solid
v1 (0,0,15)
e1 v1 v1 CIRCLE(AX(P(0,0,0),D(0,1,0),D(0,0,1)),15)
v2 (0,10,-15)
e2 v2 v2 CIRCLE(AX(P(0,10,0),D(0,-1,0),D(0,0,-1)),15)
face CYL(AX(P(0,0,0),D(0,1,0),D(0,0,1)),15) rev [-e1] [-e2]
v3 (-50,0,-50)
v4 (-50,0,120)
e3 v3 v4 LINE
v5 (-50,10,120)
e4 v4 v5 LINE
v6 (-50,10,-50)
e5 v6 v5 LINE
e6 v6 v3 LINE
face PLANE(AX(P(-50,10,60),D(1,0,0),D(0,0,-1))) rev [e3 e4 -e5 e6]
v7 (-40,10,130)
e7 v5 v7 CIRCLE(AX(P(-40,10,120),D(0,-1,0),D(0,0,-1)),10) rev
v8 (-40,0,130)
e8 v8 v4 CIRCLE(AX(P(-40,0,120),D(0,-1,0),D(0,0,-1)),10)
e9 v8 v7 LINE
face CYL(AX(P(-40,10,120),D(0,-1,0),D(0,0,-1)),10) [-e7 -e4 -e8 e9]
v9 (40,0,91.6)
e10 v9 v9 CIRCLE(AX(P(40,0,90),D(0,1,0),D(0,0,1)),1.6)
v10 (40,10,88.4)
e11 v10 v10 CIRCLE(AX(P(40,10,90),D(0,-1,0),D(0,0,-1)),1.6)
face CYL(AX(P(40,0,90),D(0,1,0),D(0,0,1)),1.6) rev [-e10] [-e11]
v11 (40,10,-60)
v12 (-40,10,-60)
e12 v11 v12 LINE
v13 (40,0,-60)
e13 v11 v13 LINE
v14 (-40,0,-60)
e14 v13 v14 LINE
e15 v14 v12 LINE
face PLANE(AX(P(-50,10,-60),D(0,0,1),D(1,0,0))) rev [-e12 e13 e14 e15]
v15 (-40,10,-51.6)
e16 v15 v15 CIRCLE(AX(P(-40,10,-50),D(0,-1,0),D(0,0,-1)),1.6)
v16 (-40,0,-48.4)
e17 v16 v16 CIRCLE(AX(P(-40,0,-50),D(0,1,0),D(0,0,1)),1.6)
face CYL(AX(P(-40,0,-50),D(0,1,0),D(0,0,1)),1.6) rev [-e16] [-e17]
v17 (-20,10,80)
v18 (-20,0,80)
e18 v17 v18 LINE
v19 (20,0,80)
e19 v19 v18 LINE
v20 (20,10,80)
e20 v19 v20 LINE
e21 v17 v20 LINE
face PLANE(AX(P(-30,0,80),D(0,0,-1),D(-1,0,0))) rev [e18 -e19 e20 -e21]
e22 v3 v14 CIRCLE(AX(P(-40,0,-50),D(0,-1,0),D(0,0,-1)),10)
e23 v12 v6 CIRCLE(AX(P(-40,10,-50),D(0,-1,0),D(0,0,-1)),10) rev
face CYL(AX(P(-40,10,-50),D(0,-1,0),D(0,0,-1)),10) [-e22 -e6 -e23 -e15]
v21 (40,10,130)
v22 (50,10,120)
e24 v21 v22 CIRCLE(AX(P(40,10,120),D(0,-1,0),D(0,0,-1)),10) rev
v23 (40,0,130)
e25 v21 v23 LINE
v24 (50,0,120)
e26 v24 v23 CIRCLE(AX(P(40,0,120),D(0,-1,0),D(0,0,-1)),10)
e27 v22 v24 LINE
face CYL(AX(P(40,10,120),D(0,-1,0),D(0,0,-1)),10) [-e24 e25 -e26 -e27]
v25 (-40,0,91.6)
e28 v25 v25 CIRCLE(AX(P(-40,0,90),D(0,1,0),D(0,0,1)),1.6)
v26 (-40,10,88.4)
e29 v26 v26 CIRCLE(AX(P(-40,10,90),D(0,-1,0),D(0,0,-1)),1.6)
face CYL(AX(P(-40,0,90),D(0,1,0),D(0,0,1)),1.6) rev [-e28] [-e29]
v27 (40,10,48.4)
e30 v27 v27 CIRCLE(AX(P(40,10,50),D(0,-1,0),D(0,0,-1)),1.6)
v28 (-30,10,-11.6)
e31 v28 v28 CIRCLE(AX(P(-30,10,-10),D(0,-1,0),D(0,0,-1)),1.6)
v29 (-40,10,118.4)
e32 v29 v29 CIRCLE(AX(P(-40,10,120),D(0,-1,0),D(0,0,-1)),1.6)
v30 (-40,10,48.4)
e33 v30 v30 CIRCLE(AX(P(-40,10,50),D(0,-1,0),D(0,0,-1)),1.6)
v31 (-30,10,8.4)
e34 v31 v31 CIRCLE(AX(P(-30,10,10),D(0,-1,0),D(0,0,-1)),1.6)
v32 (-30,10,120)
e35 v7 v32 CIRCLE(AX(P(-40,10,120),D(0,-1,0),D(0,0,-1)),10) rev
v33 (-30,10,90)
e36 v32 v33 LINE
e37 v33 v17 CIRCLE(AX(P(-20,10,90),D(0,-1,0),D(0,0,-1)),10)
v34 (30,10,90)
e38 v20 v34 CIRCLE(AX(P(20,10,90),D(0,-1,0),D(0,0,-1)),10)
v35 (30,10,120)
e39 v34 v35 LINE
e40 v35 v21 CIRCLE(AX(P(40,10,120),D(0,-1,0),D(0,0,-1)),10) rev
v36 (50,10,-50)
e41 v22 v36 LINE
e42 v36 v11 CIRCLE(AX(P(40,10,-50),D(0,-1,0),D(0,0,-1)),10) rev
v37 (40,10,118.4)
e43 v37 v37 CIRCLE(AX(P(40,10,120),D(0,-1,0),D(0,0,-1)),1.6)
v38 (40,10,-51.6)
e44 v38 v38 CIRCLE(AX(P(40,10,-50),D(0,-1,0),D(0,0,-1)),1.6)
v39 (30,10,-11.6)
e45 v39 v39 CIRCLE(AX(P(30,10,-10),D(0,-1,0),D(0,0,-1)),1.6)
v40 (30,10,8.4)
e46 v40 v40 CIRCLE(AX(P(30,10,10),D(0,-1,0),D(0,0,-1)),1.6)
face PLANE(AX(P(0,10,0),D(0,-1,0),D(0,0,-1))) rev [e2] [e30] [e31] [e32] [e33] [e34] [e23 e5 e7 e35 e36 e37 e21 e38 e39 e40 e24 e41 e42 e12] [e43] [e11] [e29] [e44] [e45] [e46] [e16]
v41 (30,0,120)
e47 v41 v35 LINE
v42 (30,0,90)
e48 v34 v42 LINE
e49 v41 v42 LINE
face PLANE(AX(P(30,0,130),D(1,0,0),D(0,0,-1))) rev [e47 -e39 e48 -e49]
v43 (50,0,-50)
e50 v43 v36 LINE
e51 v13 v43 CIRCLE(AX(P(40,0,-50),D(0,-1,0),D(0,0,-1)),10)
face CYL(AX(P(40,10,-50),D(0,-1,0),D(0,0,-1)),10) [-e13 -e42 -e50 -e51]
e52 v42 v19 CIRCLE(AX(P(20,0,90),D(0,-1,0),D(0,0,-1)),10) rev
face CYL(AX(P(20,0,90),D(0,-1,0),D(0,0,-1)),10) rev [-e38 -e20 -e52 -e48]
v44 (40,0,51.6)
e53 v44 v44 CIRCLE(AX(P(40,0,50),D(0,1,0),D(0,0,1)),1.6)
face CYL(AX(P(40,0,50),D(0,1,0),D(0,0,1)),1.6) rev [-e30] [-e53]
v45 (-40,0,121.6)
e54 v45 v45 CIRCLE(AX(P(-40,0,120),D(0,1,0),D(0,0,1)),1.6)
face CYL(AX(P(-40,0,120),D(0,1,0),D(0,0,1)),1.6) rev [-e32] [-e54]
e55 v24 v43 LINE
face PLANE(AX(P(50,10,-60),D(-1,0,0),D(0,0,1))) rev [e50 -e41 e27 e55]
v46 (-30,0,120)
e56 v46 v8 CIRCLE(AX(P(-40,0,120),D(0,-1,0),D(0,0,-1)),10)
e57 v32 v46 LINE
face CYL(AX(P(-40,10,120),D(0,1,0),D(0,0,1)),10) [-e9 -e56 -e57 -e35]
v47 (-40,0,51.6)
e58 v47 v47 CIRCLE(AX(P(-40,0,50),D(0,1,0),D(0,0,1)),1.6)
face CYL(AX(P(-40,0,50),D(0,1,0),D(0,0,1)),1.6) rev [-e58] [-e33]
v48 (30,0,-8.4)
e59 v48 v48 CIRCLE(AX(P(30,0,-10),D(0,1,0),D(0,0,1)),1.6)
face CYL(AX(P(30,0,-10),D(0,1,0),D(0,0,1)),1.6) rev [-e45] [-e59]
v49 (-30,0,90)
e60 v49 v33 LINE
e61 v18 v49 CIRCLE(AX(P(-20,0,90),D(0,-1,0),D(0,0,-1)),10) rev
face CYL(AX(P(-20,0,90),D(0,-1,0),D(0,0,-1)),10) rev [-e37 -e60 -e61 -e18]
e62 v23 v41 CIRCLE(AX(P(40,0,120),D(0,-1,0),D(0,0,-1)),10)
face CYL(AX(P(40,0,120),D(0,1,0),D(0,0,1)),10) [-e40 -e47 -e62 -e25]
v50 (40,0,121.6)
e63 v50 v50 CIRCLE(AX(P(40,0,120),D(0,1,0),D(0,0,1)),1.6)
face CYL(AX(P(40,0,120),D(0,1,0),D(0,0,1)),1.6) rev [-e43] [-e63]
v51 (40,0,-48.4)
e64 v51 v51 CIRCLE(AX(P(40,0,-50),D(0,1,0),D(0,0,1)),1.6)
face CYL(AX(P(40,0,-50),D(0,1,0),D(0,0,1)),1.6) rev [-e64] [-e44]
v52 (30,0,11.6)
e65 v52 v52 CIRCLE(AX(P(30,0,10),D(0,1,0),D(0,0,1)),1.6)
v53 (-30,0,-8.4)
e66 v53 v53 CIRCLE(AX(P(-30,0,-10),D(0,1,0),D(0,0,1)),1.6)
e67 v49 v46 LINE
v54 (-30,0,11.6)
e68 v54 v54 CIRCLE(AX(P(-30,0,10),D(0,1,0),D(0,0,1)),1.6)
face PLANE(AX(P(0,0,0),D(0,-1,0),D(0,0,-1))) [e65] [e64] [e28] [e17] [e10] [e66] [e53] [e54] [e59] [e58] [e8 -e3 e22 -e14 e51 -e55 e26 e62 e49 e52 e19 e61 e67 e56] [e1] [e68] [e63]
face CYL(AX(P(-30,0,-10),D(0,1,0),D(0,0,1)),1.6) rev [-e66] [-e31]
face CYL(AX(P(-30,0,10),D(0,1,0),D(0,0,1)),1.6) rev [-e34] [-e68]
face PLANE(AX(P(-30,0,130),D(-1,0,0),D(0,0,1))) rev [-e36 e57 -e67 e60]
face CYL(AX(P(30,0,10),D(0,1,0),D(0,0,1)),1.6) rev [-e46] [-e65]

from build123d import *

# Parameters (mm, degrees)
BOSS_EXTRUDE1_DEPTH     = 10
CUT_EXTRUDE1_DEPTH      = 140.642400438
CUT_EXTRUDE1_DEPTH_BACK = 140.642400438
SKETCH2_R               = 15
SKETCH2_R_2             = 1.6
CUT_EXTRUDE2_DEPTH      = 140.642400438
CUT_EXTRUDE2_DEPTH_BACK = 140.642400438
SKETCH3_W               = 60
SKETCH3_H               = 50
CUT_EXTRUDE3_DEPTH      = 140.642400438
CUT_EXTRUDE3_DEPTH_BACK = 140.642400438
SKETCH4_R               = 1.6
FILLET1_R               = 10


with BuildPart() as part:
    # Sketch1 → Boss-Extrude1 (new body)
    with BuildSketch(Plane(origin=(0, 0, 0), x_dir=(1, 0, 0), z_dir=(0, 1, 0))):
        Polygon((-50, -60), (-50, -130), (50, -130), (50, -60), (50, 60), (-50, 60), align=None)
    extrude(amount=BOSS_EXTRUDE1_DEPTH)

    # Sketch2 → Cut-Extrude1 (cut, two sides: drawn at the far end of the back side and taken through both)
    with BuildSketch(Plane(origin=(0, 10, 0), x_dir=(1, 0, 0), z_dir=(0, 1, 0)).offset(-CUT_EXTRUDE1_DEPTH_BACK)):
        with Locations(Location((0, 0, 0), (0, 0, 270))):
            Circle(SKETCH2_R)
        with Locations(Location((-40, -50, 0), (0, 0, 270))):
            Circle(SKETCH2_R_2)
        with Locations(Location((40, -50, 0), (0, 0, 270))):
            Circle(SKETCH2_R_2)
        with Locations(Location((40, 50, 0), (0, 0, 270))):
            Circle(SKETCH2_R_2)
        with Locations(Location((-40, 50, 0), (0, 0, 270))):
            Circle(SKETCH2_R_2)
        with Locations(Location((-40, -120, 0), (0, 0, 270))):
            Circle(SKETCH2_R_2)
        with Locations(Location((40, -120, 0), (0, 0, 270))):
            Circle(SKETCH2_R_2)
        with Locations(Location((-40, -90, 0), (0, 0, 270))):
            Circle(SKETCH2_R_2)
        with Locations(Location((40, -90, 0), (0, 0, 270))):
            Circle(SKETCH2_R_2)
    extrude(amount=CUT_EXTRUDE1_DEPTH + CUT_EXTRUDE1_DEPTH_BACK, mode=Mode.SUBTRACT)

    # Sketch3 → Cut-Extrude2 (cut, two sides: drawn at the far end of the back side and taken through both)
    with BuildSketch(Plane(origin=(0, 10, 0), x_dir=(1, 0, 0), z_dir=(0, 1, 0)).offset(-CUT_EXTRUDE2_DEPTH_BACK)):
        with Locations((0, -105)):
            Rectangle(SKETCH3_W, SKETCH3_H)
    extrude(amount=CUT_EXTRUDE2_DEPTH + CUT_EXTRUDE2_DEPTH_BACK, mode=Mode.SUBTRACT)

    # Sketch4 → Cut-Extrude3 (cut, two sides: drawn at the far end of the back side and taken through both)
    with BuildSketch(Plane(origin=(0, 10, 0), x_dir=(1, 0, 0), z_dir=(0, 1, 0)).offset(-CUT_EXTRUDE3_DEPTH_BACK)):
        with Locations(Location((-30, 10, 0), (0, 0, 270))):
            Circle(SKETCH4_R)
        with Locations(Location((-30, -10, 0), (0, 0, 270))):
            Circle(SKETCH4_R)
        with Locations(Location((30, 10, 0), (0, 0, 270))):
            Circle(SKETCH4_R)
        with Locations(Location((30, -10, 0), (0, 0, 270))):
            Circle(SKETCH4_R)
    extrude(amount=CUT_EXTRUDE3_DEPTH + CUT_EXTRUDE3_DEPTH_BACK, mode=Mode.SUBTRACT)

    # Fillet1
    fillet1_edges = [part.edges().sort_by_distance(p)[0] for p in [
        (50, 5, -60),
        (-50, 5, -60),
        (-50, 5, 130),
        (-30, 5, 130),
        (50, 5, 130),
        (30, 5, 130),
        (30, 5, 80),
        (-30, 5, 80),
    ]]
    fillet(fillet1_edges, radius=FILLET1_R - 0.0001)  # a hair under: the kernel refuses the full size


solid = part.part
